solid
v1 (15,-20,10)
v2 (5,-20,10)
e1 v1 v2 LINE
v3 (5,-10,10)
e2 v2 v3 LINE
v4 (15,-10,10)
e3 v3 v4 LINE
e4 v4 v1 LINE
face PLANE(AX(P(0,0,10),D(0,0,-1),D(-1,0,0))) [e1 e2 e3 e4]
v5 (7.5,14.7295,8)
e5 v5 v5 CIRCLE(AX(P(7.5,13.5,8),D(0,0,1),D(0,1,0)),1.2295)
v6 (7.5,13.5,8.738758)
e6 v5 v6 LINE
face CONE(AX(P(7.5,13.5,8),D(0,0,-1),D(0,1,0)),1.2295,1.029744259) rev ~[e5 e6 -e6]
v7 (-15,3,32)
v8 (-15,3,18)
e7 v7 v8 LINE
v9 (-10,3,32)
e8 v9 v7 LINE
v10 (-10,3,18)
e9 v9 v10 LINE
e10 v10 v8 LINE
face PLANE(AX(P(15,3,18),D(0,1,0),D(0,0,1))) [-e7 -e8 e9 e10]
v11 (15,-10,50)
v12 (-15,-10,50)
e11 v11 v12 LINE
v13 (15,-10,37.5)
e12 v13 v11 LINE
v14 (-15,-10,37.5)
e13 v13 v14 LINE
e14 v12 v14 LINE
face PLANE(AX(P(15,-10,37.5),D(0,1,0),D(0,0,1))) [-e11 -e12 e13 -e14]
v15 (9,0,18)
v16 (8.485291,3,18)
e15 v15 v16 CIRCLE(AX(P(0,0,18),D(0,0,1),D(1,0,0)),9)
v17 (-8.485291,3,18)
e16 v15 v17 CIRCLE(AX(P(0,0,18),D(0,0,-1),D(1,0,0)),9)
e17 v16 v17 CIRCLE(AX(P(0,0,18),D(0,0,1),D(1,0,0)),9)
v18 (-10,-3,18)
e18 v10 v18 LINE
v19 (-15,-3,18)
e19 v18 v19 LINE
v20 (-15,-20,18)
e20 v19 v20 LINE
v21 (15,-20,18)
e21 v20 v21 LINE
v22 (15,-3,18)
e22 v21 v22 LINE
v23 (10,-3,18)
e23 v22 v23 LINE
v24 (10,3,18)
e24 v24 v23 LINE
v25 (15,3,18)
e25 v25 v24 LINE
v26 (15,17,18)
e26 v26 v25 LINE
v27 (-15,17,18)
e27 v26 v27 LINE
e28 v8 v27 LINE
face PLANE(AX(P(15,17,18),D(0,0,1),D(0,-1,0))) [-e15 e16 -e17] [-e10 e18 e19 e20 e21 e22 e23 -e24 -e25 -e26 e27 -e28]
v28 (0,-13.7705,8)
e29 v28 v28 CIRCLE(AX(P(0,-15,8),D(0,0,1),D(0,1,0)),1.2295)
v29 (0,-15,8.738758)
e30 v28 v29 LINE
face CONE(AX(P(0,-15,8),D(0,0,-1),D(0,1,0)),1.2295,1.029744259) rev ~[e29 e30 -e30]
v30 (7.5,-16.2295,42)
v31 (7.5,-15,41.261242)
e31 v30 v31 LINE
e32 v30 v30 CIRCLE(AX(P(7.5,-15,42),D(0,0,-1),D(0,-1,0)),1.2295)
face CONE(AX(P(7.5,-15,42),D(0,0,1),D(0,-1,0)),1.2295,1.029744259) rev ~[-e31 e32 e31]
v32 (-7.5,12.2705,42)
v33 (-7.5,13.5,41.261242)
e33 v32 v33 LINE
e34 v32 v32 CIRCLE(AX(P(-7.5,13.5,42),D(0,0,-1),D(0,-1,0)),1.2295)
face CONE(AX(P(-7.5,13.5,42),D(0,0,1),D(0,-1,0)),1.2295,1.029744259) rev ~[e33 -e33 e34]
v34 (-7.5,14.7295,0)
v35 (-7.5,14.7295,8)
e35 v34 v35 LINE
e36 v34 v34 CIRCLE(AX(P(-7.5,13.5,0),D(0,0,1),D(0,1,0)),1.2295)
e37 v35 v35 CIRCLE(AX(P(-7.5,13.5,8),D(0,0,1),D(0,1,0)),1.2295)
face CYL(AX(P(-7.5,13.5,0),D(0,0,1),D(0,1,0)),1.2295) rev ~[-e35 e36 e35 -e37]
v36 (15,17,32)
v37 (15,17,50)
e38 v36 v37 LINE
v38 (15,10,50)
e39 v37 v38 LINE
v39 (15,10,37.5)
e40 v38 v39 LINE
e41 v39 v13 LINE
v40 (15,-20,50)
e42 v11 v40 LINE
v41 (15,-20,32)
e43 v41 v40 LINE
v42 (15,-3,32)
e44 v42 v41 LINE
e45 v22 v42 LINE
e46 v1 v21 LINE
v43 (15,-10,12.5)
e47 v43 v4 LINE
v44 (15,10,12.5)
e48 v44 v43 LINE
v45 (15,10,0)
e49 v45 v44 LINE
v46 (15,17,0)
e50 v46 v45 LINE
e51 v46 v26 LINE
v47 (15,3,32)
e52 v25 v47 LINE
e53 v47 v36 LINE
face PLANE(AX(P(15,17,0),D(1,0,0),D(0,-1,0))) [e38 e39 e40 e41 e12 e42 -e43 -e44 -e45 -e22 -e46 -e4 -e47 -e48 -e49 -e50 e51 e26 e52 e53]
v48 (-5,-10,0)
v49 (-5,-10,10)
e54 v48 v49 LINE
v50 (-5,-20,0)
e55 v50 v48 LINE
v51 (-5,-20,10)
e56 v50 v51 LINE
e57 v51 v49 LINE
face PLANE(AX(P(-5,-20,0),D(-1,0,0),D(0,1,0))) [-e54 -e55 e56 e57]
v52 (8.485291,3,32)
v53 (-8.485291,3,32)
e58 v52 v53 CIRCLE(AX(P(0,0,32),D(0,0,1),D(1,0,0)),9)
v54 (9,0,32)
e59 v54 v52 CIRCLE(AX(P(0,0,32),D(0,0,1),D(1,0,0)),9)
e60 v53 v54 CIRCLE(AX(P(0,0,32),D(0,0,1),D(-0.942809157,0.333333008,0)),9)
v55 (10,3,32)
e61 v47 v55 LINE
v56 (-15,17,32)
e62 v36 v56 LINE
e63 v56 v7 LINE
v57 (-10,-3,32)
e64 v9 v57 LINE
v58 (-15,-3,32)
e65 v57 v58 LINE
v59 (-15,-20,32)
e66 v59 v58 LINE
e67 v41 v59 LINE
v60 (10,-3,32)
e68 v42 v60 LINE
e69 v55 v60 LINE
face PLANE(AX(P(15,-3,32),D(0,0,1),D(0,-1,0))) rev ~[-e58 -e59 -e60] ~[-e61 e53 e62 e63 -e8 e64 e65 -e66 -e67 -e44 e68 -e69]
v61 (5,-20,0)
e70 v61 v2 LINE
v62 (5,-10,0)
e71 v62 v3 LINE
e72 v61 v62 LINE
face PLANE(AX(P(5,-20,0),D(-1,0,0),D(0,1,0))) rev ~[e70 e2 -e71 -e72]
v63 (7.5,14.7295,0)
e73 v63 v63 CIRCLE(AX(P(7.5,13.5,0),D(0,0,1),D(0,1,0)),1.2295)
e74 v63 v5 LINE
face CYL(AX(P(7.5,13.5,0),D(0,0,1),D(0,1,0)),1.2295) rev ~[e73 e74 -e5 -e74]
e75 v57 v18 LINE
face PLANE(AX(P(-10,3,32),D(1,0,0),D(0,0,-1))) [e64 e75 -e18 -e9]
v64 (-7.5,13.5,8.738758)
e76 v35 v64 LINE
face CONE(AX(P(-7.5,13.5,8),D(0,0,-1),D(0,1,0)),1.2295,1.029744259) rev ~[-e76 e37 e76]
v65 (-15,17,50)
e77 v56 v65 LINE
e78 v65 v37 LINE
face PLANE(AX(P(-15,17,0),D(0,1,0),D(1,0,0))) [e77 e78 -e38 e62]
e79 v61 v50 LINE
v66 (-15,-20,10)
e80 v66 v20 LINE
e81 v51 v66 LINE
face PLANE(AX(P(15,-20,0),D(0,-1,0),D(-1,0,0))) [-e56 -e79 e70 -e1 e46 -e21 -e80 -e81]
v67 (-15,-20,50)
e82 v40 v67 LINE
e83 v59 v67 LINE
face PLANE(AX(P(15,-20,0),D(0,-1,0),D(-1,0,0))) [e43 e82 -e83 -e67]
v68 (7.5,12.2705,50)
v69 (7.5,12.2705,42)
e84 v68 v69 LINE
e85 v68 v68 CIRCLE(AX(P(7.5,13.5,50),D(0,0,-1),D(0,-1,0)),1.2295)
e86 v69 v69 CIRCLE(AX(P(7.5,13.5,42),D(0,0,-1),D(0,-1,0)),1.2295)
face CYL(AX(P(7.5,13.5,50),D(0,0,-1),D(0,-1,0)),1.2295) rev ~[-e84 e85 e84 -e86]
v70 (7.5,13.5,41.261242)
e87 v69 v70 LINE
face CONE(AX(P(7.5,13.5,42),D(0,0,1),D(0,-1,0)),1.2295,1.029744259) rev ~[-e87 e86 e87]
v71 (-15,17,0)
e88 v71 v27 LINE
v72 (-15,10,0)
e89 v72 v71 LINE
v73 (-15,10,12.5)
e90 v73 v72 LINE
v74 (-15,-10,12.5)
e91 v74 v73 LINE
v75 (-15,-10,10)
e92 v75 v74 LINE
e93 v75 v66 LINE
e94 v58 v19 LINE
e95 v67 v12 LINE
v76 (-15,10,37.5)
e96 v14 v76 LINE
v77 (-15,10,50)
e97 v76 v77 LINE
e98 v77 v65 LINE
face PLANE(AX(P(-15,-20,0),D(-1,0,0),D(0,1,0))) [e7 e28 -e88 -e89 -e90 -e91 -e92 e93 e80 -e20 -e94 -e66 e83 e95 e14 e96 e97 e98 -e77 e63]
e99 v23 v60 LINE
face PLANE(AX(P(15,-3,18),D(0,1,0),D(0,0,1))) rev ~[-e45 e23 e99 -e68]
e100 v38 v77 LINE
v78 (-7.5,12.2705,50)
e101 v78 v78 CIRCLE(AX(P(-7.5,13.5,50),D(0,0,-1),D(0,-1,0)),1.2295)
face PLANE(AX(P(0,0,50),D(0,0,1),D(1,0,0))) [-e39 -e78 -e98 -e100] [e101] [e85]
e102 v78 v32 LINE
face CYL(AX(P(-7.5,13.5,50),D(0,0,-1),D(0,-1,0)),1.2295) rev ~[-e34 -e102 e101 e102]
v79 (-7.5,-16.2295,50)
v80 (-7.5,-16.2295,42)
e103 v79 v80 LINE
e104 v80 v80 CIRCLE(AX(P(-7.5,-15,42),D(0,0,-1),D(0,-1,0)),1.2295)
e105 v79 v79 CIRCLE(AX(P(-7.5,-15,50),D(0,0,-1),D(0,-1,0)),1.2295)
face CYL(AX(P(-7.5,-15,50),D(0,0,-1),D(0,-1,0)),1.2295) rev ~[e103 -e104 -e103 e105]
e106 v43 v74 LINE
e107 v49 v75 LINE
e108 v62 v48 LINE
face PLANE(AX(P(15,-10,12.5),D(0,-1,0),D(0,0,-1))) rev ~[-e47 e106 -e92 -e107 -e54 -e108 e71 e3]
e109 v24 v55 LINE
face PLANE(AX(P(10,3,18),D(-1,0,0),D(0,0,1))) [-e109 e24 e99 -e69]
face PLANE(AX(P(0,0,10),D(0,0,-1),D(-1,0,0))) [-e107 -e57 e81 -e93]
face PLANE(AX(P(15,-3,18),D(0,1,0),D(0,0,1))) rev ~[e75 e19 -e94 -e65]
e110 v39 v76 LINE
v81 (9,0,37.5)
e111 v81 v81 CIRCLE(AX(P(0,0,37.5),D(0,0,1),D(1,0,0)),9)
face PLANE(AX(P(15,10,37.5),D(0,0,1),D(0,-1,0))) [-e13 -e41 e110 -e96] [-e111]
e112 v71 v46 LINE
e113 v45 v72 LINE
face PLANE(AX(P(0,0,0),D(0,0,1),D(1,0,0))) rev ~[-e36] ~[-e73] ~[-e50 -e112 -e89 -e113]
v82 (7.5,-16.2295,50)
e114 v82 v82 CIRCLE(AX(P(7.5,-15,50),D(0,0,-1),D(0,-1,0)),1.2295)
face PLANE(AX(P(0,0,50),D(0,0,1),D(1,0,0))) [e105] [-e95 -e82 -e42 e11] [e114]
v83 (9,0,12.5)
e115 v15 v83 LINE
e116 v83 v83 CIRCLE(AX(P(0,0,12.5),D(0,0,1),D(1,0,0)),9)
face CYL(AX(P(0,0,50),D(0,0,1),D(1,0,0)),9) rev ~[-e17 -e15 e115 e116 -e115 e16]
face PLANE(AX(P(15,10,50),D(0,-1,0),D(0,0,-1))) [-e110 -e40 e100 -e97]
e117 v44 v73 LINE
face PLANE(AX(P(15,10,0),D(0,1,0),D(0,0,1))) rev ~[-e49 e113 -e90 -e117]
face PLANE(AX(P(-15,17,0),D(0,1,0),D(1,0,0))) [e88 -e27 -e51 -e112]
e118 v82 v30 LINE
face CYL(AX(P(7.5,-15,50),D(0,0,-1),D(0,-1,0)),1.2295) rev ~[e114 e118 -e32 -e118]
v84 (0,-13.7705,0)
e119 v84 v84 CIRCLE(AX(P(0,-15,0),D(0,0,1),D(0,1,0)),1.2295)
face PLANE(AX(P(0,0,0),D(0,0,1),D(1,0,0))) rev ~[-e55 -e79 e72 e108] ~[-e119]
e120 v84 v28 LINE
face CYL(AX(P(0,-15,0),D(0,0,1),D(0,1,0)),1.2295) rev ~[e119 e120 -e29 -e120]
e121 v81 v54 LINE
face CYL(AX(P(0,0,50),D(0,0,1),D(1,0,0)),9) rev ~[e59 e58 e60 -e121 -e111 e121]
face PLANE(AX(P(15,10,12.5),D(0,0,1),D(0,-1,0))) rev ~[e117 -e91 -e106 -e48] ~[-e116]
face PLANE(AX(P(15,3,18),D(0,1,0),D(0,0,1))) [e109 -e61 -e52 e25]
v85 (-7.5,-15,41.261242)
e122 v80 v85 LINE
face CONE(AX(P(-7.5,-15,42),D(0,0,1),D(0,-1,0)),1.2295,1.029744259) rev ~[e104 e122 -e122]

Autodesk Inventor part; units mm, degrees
ref_plane "YZ Plane" through (0, 0, 0) normal (1, 0, 0) x (0, 1, 0)
ref_plane "XZ Plane" through (0, 0, 0) normal (0, 1, 0) x (-1, 0, 0)
ref_plane "XY Plane" through (0, 0, 0) normal (0, 0, 1) x (1, 0, 0)
sketch "Sketch1" plane through (0, 0, 0) normal (0, 0, 1) x (1, 0, 0)
  line L0 (-15, 17) -> (15, 17)
  line L1 (15, 17) -> (15, -20)
  line L2 (15, -20) -> (-15, -20)
  line L3 (-15, -20) -> (-15, 17)
  point P0 (0, 0)
  dimension "d0" = 37
  dimension "d1" = 30
  dimension "d2" = 15
  dimension "d3" = 20
extrude "Extrusion1" add sketch "Sketch1" along normal blind 50
sketch "Sketch2" plane through (0, 0, 50) normal (0, 0, 1) x (1, 0, 0)
  circle A0 centre (0, 0) radius 9
  dimension "d6" = 18
extrude "Extrusion2" cut sketch "Sketch2" against normal through all
sketch "Sketch3" plane through (15, -20, 0) normal (1, 0, 0) x (0, 0, -1)
  line L0 (-50, 30) -> (-37.5, 30)
  line L1 (-37.5, 30) -> (-37.5, 10)
  line L2 (-37.5, 10) -> (-50, 10)
  line L3 (-50, 10) -> (-50, 30)
  line L4 (0, 0) -> (0, 37) projected
  line L5 (0, 30) -> (-12.5, 30)
  line L6 (-12.5, 30) -> (-12.5, 10)
  line L7 (-12.5, 10) -> (0, 10)
  line L8 (0, 10) -> (0, 30)
  line L9 (0, 0) -> (-50, 0) projected
  line L10 (0, 37) -> (-50, 37) projected
  line L11 (-50, 0) -> (-50, 37) projected
  point P0 (0, 20)
  dimension "d9" = 10
  dimension "d10" = 7
  dimension "d11" = 10
  dimension "d12" = 0
  dimension "d13" = 12.5
  dimension "d14" = 12.5
extrude "Extrusion3" cut sketch "Sketch3" against normal through all contours L0 L1 L2 L3 | L4 L7 L6 L5
sketch "Sketch4" plane through (15, -20, 50) normal (1, 0, 0) x (0, 0, -1)
  line L0 (18, 37) -> (32, 37)
  line L1 (32, 37) -> (32, 23)
  line L2 (32, 23) -> (18, 23)
  line L3 (18, 23) -> (18, 37)
  line L4 (18, 0) -> (32, 0)
  line L5 (32, 0) -> (32, 17)
  line L6 (32, 17) -> (18, 17)
  line L7 (18, 17) -> (18, 0)
  line L8 (50, 37) -> (0, 37) projected
  line L9 (50, 0) -> (0, 0) projected
  line L10 (0, 30) -> (0, 37) projected
  point P0 (50, 20)
  dimension "d17" = 14
  dimension "d18" = 0
  dimension "d19" = 0
  dimension "d20" = 18
  dimension "d21" = 17
  dimension "d22" = 14
extrude "Extrusion4" cut sketch "Sketch4" against normal through all
sketch "Sketch5" plane through (0, 0, 0) normal (0, 0, -1) x (-1, 0, 0)
  line L0 (-15, -20) -> (15, -20) projected
  line L1 (-15, -20) -> (-5, -20)
  line L2 (-5, -20) -> (-5, -10)
  line L3 (-5, -10) -> (-15, -10)
  line L4 (-15, -10) -> (-15, -20)
  line L5 (15, -20) -> (5, -20)
  line L6 (5, -20) -> (5, -10)
  line L7 (5, -10) -> (15, -10)
  line L8 (15, -10) -> (15, -20)
  line L9 (15, -10) -> (-15, -10) projected
  point P0 (0, 0)
  dimension "d27" = 10
  dimension "d28" = 10
  dimension "d31" = 0
  dimension "d32" = 0
extrude "Extrusion5" cut sketch "Sketch5" against normal blind 10 contours L4 L3 L2 L0 | L6 L7 L8 L0
sketch "Sketch6" plane through (0, 0, 50) normal (0, 0, 1) x (1, 0, 0)
  line L0 (15, 17) -> (-15, 17) projected
  line L1 (-15, 17) -> (-15, 10) projected
  line L2 (-15, -10) -> (-15, -20) projected
  line L3 (-15, -20) -> (15, -20) projected
  point P0 (0, 0)
  point P1 (-7.5, 13.5)
  point P2 (7.5, 13.5)
  point P3 (-7.5, -15)
  point P4 (7.5, -15)
  dimension "d33" = 3.5
  dimension "d34" = 3.5
  dimension "d35" = 15
  dimension "d36" = 7.5
  dimension "d37" = 7.5
  dimension "d38" = 15
  dimension "d39" = 5
  dimension "d40" = 5
hole "Hole1" at (-7.5, 13.5, 50) at (7.5, 13.5, 50) at (-7.5, -15, 50) at (7.5, -15, 50) direction (0, 0, -1) diameter 2.459 depth 8 tip angle 118 thread size "M3x0.5" class "6H" standard "ANSI Metric M Profile"
sketch "Sketch7" plane through (0, 0, 0) normal (0, 0, -1) x (-1, 0, 0)
  circle A0 centre (-7.5, 13.5) radius 1.2295 projected
  circle A1 centre (7.5, 13.5) radius 1.2295 projected
  point P0 (0, 0)
  point P1 (0, -15)
  dimension "d49" = 15
  dimension "d50" = 0
hole "Hole2" at (7.5, 13.5, 0) at (-7.5, 13.5, 0) at (0, -15, 0) direction (0, 0, 1) diameter 2.459 depth 8 tip angle 118 thread size "M3x0.5" class "6H" standard "ANSI Metric M Profile"
sketch "Sketch8" plane through (-15, 3, 18) normal (0, 1, 0) x (1, 0, 0)
  line L0 (30, -14) -> (23.4853, -14) projected
  line L1 (5, 0) -> (25, 0)
  line L2 (25, 0) -> (25, -14)
  line L3 (25, -14) -> (5, -14)
  line L4 (5, -14) -> (5, 0)
  line L5 (0, 0) -> (30, 0) projected
  line L6 (23.4853, -14) -> (23.4853, 0) projected
  line L7 (6.5147, 0) -> (6.5147, -14) projected
  line L8 (30, 0) -> (30, -14) projected
  line L9 (0, -14) -> (0, 0) projected
  point P0 (15, 18)
  dimension "d58" = 0
  dimension "d63" = 5
  dimension "d64" = 5
extrude "Extrusion6" cut sketch "Sketch8" against normal through all contours L0 L6 L1 L2 | L3 L4 L1 L7
properties part number "RotationShell"
